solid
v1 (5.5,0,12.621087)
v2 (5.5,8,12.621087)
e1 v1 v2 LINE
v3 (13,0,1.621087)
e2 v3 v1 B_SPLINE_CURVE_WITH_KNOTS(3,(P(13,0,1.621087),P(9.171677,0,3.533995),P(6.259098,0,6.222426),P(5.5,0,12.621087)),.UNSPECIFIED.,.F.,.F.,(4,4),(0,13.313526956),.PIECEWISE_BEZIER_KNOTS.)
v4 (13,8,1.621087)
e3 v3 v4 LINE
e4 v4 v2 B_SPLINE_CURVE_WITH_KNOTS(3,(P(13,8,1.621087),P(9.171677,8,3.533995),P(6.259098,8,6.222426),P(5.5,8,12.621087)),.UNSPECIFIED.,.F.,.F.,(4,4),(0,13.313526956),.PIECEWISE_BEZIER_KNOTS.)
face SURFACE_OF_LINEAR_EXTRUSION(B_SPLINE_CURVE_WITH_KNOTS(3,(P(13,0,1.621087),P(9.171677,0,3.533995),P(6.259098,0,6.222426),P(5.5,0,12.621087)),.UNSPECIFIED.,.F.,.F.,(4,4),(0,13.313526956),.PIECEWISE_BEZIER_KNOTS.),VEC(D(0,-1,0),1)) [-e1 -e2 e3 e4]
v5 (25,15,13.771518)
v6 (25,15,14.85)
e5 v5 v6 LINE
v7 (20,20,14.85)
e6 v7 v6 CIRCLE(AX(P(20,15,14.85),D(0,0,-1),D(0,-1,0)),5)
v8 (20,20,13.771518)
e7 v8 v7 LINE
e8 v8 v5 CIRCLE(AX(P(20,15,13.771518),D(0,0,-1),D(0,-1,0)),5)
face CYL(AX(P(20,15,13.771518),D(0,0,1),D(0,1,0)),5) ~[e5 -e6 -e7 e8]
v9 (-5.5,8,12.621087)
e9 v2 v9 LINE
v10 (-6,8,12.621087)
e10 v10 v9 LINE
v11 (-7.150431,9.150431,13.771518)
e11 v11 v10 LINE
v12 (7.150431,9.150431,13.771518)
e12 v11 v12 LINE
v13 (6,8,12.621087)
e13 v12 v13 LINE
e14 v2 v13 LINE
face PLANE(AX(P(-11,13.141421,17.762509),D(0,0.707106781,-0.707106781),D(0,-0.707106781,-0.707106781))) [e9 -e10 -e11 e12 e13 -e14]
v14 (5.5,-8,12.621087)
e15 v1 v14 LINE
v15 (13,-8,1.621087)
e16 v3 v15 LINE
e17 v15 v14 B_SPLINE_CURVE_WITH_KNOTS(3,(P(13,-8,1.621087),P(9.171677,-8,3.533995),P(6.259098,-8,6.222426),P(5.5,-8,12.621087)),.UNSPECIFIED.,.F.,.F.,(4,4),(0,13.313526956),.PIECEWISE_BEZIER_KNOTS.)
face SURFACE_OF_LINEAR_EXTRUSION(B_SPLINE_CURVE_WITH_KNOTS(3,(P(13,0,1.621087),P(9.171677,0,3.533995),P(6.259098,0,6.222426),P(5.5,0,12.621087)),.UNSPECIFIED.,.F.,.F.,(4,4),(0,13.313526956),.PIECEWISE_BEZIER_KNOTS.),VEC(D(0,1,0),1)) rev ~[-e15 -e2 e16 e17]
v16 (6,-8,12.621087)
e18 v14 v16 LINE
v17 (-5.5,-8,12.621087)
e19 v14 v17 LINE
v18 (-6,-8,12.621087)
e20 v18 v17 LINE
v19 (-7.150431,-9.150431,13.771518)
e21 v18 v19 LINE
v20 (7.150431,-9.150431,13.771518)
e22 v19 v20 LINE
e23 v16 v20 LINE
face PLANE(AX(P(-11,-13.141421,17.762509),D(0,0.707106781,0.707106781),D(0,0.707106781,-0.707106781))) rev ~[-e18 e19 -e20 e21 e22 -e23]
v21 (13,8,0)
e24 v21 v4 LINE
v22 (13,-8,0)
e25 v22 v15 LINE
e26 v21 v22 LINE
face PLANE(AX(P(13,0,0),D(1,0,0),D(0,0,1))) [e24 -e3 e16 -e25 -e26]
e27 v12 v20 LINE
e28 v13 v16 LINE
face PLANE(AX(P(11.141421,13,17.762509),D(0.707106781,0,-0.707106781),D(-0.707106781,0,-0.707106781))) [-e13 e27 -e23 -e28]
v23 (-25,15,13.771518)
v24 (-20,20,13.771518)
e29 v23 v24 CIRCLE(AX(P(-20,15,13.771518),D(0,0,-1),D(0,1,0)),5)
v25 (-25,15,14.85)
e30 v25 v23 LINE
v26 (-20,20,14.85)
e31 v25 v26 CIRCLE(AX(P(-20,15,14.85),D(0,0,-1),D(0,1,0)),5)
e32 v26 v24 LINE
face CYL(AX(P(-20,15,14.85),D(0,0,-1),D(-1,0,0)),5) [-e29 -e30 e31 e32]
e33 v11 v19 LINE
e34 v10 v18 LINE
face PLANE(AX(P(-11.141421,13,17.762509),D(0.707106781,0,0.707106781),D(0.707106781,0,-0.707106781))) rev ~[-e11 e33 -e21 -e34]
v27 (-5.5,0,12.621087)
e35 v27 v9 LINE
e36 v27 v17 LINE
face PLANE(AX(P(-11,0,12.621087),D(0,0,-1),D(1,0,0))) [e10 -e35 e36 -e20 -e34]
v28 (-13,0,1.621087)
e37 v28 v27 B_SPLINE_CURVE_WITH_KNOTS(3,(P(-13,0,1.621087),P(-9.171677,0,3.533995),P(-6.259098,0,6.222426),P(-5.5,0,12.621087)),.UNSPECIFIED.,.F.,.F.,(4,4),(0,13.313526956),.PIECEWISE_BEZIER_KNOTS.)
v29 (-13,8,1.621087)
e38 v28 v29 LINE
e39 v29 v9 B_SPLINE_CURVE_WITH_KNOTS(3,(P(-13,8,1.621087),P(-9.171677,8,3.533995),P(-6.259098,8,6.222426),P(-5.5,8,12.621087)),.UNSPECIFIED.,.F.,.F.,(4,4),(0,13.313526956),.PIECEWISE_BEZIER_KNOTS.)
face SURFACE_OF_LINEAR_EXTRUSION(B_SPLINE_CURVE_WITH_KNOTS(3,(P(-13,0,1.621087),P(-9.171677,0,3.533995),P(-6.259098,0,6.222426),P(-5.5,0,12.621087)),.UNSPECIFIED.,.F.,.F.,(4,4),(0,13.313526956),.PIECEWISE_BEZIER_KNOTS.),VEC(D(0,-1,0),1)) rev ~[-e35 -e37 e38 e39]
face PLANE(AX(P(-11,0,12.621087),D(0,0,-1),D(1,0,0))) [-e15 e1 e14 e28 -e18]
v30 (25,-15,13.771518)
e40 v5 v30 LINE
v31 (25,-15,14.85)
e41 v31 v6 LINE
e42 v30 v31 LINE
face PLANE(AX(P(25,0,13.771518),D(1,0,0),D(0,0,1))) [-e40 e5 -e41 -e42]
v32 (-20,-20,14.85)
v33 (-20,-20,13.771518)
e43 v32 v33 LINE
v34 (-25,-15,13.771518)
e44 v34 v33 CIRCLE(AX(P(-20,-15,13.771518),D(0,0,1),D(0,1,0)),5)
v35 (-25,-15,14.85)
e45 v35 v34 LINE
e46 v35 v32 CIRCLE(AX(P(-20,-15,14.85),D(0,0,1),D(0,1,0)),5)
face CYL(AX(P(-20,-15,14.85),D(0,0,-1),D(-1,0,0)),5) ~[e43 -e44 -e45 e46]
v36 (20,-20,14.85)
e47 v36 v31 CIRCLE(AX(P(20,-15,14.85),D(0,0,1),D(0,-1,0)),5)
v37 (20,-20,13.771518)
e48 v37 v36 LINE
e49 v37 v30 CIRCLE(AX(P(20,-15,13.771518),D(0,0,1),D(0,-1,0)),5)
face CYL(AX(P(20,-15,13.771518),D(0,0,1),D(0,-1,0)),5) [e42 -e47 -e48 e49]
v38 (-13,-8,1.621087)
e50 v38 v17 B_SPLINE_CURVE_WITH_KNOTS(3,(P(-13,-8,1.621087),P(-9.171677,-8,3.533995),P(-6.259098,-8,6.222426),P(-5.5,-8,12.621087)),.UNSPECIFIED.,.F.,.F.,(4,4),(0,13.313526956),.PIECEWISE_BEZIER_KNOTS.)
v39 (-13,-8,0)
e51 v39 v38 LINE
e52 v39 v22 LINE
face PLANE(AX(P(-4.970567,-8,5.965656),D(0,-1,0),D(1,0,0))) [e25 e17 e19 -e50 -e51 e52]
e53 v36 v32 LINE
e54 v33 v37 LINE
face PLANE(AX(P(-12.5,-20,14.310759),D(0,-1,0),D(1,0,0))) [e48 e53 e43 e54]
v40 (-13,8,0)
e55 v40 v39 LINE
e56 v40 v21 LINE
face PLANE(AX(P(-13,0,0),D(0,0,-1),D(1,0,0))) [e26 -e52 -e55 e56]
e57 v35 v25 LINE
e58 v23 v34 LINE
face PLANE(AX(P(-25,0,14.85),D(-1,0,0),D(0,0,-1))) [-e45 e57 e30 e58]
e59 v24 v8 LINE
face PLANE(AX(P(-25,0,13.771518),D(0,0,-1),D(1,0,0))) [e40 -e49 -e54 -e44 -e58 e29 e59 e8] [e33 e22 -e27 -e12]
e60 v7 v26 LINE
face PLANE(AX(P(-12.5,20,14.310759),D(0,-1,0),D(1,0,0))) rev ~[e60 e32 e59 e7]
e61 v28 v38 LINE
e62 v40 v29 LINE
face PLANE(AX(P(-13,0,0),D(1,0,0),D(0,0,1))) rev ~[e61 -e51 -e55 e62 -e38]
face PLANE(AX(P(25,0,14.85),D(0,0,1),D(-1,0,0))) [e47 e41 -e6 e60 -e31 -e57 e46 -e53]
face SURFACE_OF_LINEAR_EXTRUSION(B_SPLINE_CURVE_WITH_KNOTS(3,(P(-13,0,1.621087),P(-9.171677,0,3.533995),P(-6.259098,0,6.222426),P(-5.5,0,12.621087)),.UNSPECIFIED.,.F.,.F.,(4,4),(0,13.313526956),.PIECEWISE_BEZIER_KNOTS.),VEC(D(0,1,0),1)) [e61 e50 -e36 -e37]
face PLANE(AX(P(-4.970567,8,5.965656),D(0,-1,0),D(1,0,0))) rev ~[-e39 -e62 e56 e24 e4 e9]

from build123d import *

# Parameters (mm, degrees)
F1_DEPTH     = 20
F2_DEPTH     = 13
F0_W         = 13
F0_H         = 1.6210871795
F3_T4_DEPTH  = 22
F3_T9_DEPTH  = 26
F3_T14_DEPTH = 26
F3_T19_DEPTH = 22
F3_T25_DEPTH = 38.8584149398
F3_T30_DEPTH = 34.8584149398
F3_T38_DEPTH = 34.8584149398
F3_T43_DEPTH = 38.8584149398
F3_T51_DEPTH = 38.8584149398
F3_T56_DEPTH = 34.8584149398
F3_T64_DEPTH = 38.8584149398
F3_T69_DEPTH = 34.8584149398
F4_R         = 5
F5_R         = 5
F7_DEPTH     = 8


# Not quite as in the source:
# - a fillet or chamfer that OpenCascade refuses, or shapes differently, is made with other operations: its cross-section is extruded or revolved along the edge and cut away or added


with BuildPart() as f1:
    # F0 (on Front) → F1 (new body, symmetric)
    with BuildSketch(Plane.XZ):
        Polygon((0, 13.7715177082), (0, 14.85), (-25, 14.85), (-25, 13.7715177082), (-11, 13.7715177082), align=None)
        Polygon((25, 14.85), (0, 14.85), (0, 13.7715177082), (11, 13.7715177082), (25, 13.7715177082), align=None)
    extrude(amount=F1_DEPTH, both=True)

    # F0 (on Front) → F2 (join, symmetric)
    with BuildSketch(Plane.XZ):
        Polygon((0, 12.6210871795), (0, 13.7715177082), (-11, 13.7715177082), (-11, 12.6210871795), (-5.5, 12.6210871795), align=None)
        Polygon((11, 13.7715177082), (0, 13.7715177082), (0, 12.6210871795), (5.5, 12.6210871795), (11, 12.6210871795), align=None)
    extrude(amount=F2_DEPTH, both=True)

    # F3: chamfer of 5 on 4 edges, made by hand


with BuildPart() as f2:
    # F0 (on Front) → F2, piece 2 (new body, symmetric)
    with BuildSketch(Plane.XZ):
        with Locations((-6.5, 0.8105435898)):
            Rectangle(F0_W, F0_H)
        with Locations((6.5, 0.8105435898)):
            Rectangle(F0_W, F0_H)
    extrude(amount=F2_DEPTH, both=True)

    # F4
    f4_edges = [f2.edges().sort_by_distance(p)[0] for p in [
        (-13, 13, 0.810544),
        (-13, -13, 0.810544),
        (13, -13, 0.810544),
        (13, 13, 0.810544),
    ]]
    fillet(f4_edges, radius=F4_R)


with BuildPart() as f3_tool2:
    # F3_s3 → F3_t4 (new body)
    with BuildSketch(Plane.YZ.offset(-11)):
        with BuildLine():
            Line((13.1414213562, 17.7625085358), (7.8585786438, 12.4796658233))
            Line((7.8585786438, 12.4796658233), (7.8585786438, 12.3796658233))
            ThreePointArc((7.8585786438, 12.3796658233), (10.4292893219, 12.5210871795), (13, 12.5210871795))
            Line((13, 12.5210871795), (13.1, 12.6210871795))
            ThreePointArc((13.1, 12.6210871795), (13.1, 15.1917978577), (13.2414213562, 17.7625085358))
            Line((13.2414213562, 17.7625085358), (13.1414213562, 17.7625085358))
        make_face()
    extrude(amount=F3_T4_DEPTH)

    split(bisect_by=Plane.XY.offset(13.7715177082), keep=Keep.BOTTOM)


with BuildPart() as f1_1:
    add(f1.part)

    # F3_t1: cut F3_tool2
    add(f3_tool2.part, mode=Mode.SUBTRACT)


with BuildPart() as f3_tool7:
    # F3_s8 → F3_t9 (new body)
    with BuildSketch(Plane.XZ.offset(-13)):
        with BuildLine():
            Line((-11.1414213562, 17.7625085358), (-5.8585786438, 12.4796658233))
            Line((-5.8585786438, 12.4796658233), (-5.8585786438, 12.3796658233))
            ThreePointArc((-5.8585786438, 12.3796658233), (-8.4292893219, 12.5210871795), (-11, 12.5210871795))
            Line((-11, 12.5210871795), (-11.1, 12.6210871795))
            ThreePointArc((-11.1, 12.6210871795), (-11.1, 15.1917978577), (-11.2414213562, 17.7625085358))
            Line((-11.2414213562, 17.7625085358), (-11.1414213562, 17.7625085358))
        make_face()
    extrude(amount=F3_T9_DEPTH)

    split(bisect_by=Plane.XY.offset(13.7715177082), keep=Keep.BOTTOM)


with BuildPart() as f1_2:
    add(f1_1.part)

    # F3_t6: cut F3_tool7
    add(f3_tool7.part, mode=Mode.SUBTRACT)


with BuildPart() as f3_tool12:
    # F3_s13 → F3_t14 (new body)
    with BuildSketch(Plane.XZ.offset(-13)):
        with BuildLine():
            Line((11.1414213562, 17.7625085358), (5.8585786438, 12.4796658233))
            Line((5.8585786438, 12.4796658233), (5.8585786438, 12.3796658233))
            ThreePointArc((5.8585786438, 12.3796658233), (8.4292893219, 12.5210871795), (11, 12.5210871795))
            Line((11, 12.5210871795), (11.1, 12.6210871795))
            ThreePointArc((11.1, 12.6210871795), (11.1, 15.1917978577), (11.2414213562, 17.7625085358))
            Line((11.2414213562, 17.7625085358), (11.1414213562, 17.7625085358))
        make_face()
    extrude(amount=F3_T14_DEPTH)

    split(bisect_by=Plane.XY.offset(13.7715177082), keep=Keep.BOTTOM)


with BuildPart() as f1_3:
    add(f1_2.part)

    # F3_t11: cut F3_tool12
    add(f3_tool12.part, mode=Mode.SUBTRACT)


with BuildPart() as f3_tool17:
    # F3_s18 → F3_t19 (new body)
    with BuildSketch(Plane.YZ.offset(-11)):
        with BuildLine():
            Line((-13.1414213562, 17.7625085358), (-7.8585786438, 12.4796658233))
            Line((-7.8585786438, 12.4796658233), (-7.8585786438, 12.3796658233))
            ThreePointArc((-7.8585786438, 12.3796658233), (-10.4292893219, 12.5210871795), (-13, 12.5210871795))
            Line((-13, 12.5210871795), (-13.1, 12.6210871795))
            ThreePointArc((-13.1, 12.6210871795), (-13.1, 15.1917978577), (-13.2414213562, 17.7625085358))
            Line((-13.2414213562, 17.7625085358), (-13.1414213562, 17.7625085358))
        make_face()
    extrude(amount=F3_T19_DEPTH)

    split(bisect_by=Plane.XY.offset(13.7715177082), keep=Keep.BOTTOM)


with BuildPart() as f1_4:
    add(f1_3.part)

    # F3_t16: cut F3_tool17
    add(f3_tool17.part, mode=Mode.SUBTRACT)


with BuildPart() as f3_tool23:
    # F3_s24 → F3_t25 (new body)
    with BuildSketch(Plane.XZ.offset(-25.8584149398)):
        with BuildLine():
            Line((-11.1414213562, 17.7625085358), (-5.8585786438, 12.4796658233))
            Line((-5.8585786438, 12.4796658233), (-5.8585786438, 12.3796658233))
            ThreePointArc((-5.8585786438, 12.3796658233), (-8.4292893219, 12.5210871795), (-11, 12.5210871795))
            Line((-11, 12.5210871795), (-11.1, 12.6210871795))
            ThreePointArc((-11.1, 12.6210871795), (-11.1, 15.1917978577), (-11.2414213562, 17.7625085358))
            Line((-11.2414213562, 17.7625085358), (-11.1414213562, 17.7625085358))
        make_face()
    extrude(amount=F3_T25_DEPTH)

    split(bisect_by=Plane.XY.offset(13.7715177082), keep=Keep.BOTTOM)

    split(bisect_by=Plane.XZ.offset(-13), keep=Keep.BOTTOM)


with BuildPart() as f3_tool28:
    # F3_s29 → F3_t30 (new body)
    with BuildSketch(Plane.YZ.offset(-23.8584149398)):
        with BuildLine():
            Line((13.1414213562, 17.7625085358), (7.8585786438, 12.4796658233))
            Line((7.8585786438, 12.4796658233), (7.8585786438, 12.3796658233))
            ThreePointArc((7.8585786438, 12.3796658233), (10.4292893219, 12.5210871795), (13, 12.5210871795))
            Line((13, 12.5210871795), (13.1, 12.6210871795))
            ThreePointArc((13.1, 12.6210871795), (13.1, 15.1917978577), (13.2414213562, 17.7625085358))
            Line((13.2414213562, 17.7625085358), (13.1414213562, 17.7625085358))
        make_face()
    extrude(amount=F3_T30_DEPTH)

    split(bisect_by=Plane.XY.offset(13.7715177082), keep=Keep.BOTTOM)

    split(bisect_by=Plane.YZ.offset(-11), keep=Keep.BOTTOM)


with BuildPart() as f3_tool23_1:
    add(f3_tool23.part)

    # F3_t33: intersect F3_tool28
    add(f3_tool28.part, mode=Mode.INTERSECT)


with BuildPart() as f1_5:
    add(f1_4.part)

    # F3_t21: cut F3_tool23
    add(f3_tool23_1.part, mode=Mode.SUBTRACT)


with BuildPart() as f3_tool36:
    # F3_s37 → F3_t38 (new body)
    with BuildSketch(Plane.YZ.offset(-11)):
        with BuildLine():
            Line((13.1414213562, 17.7625085358), (7.8585786438, 12.4796658233))
            Line((7.8585786438, 12.4796658233), (7.8585786438, 12.3796658233))
            ThreePointArc((7.8585786438, 12.3796658233), (10.4292893219, 12.5210871795), (13, 12.5210871795))
            Line((13, 12.5210871795), (13.1, 12.6210871795))
            ThreePointArc((13.1, 12.6210871795), (13.1, 15.1917978577), (13.2414213562, 17.7625085358))
            Line((13.2414213562, 17.7625085358), (13.1414213562, 17.7625085358))
        make_face()
    extrude(amount=F3_T38_DEPTH)

    split(bisect_by=Plane.XY.offset(13.7715177082), keep=Keep.BOTTOM)

    split(bisect_by=Plane.YZ.offset(11), keep=Keep.TOP)


with BuildPart() as f3_tool41:
    # F3_s42 → F3_t43 (new body)
    with BuildSketch(Plane.XZ.offset(-25.8584149398)):
        with BuildLine():
            Line((11.1414213562, 17.7625085358), (5.8585786438, 12.4796658233))
            Line((5.8585786438, 12.4796658233), (5.8585786438, 12.3796658233))
            ThreePointArc((5.8585786438, 12.3796658233), (8.4292893219, 12.5210871795), (11, 12.5210871795))
            Line((11, 12.5210871795), (11.1, 12.6210871795))
            ThreePointArc((11.1, 12.6210871795), (11.1, 15.1917978577), (11.2414213562, 17.7625085358))
            Line((11.2414213562, 17.7625085358), (11.1414213562, 17.7625085358))
        make_face()
    extrude(amount=F3_T43_DEPTH)

    split(bisect_by=Plane.XY.offset(13.7715177082), keep=Keep.BOTTOM)

    split(bisect_by=Plane.XZ.offset(-13), keep=Keep.BOTTOM)


with BuildPart() as f3_tool36_1:
    add(f3_tool36.part)

    # F3_t46: intersect F3_tool41
    add(f3_tool41.part, mode=Mode.INTERSECT)


with BuildPart() as f1_6:
    add(f1_5.part)

    # F3_t34: cut F3_tool36
    add(f3_tool36_1.part, mode=Mode.SUBTRACT)


with BuildPart() as f3_tool49:
    # F3_s50 → F3_t51 (new body)
    with BuildSketch(Plane.XZ.offset(-13)):
        with BuildLine():
            Line((-11.1414213562, 17.7625085358), (-5.8585786438, 12.4796658233))
            Line((-5.8585786438, 12.4796658233), (-5.8585786438, 12.3796658233))
            ThreePointArc((-5.8585786438, 12.3796658233), (-8.4292893219, 12.5210871795), (-11, 12.5210871795))
            Line((-11, 12.5210871795), (-11.1, 12.6210871795))
            ThreePointArc((-11.1, 12.6210871795), (-11.1, 15.1917978577), (-11.2414213562, 17.7625085358))
            Line((-11.2414213562, 17.7625085358), (-11.1414213562, 17.7625085358))
        make_face()
    extrude(amount=F3_T51_DEPTH)

    split(bisect_by=Plane.XY.offset(13.7715177082), keep=Keep.BOTTOM)

    split(bisect_by=Plane.XZ.offset(13), keep=Keep.TOP)


with BuildPart() as f3_tool54:
    # F3_s55 → F3_t56 (new body)
    with BuildSketch(Plane.YZ.offset(-23.8584149398)):
        with BuildLine():
            Line((-13.1414213562, 17.7625085358), (-7.8585786438, 12.4796658233))
            Line((-7.8585786438, 12.4796658233), (-7.8585786438, 12.3796658233))
            ThreePointArc((-7.8585786438, 12.3796658233), (-10.4292893219, 12.5210871795), (-13, 12.5210871795))
            Line((-13, 12.5210871795), (-13.1, 12.6210871795))
            ThreePointArc((-13.1, 12.6210871795), (-13.1, 15.1917978577), (-13.2414213562, 17.7625085358))
            Line((-13.2414213562, 17.7625085358), (-13.1414213562, 17.7625085358))
        make_face()
    extrude(amount=F3_T56_DEPTH)

    split(bisect_by=Plane.XY.offset(13.7715177082), keep=Keep.BOTTOM)

    split(bisect_by=Plane.YZ.offset(-11), keep=Keep.BOTTOM)


with BuildPart() as f3_tool49_1:
    add(f3_tool49.part)

    # F3_t59: intersect F3_tool54
    add(f3_tool54.part, mode=Mode.INTERSECT)


with BuildPart() as f1_7:
    add(f1_6.part)

    # F3_t47: cut F3_tool49
    add(f3_tool49_1.part, mode=Mode.SUBTRACT)


with BuildPart() as f3_tool62:
    # F3_s63 → F3_t64 (new body)
    with BuildSketch(Plane.XZ.offset(-13)):
        with BuildLine():
            Line((11.1414213562, 17.7625085358), (5.8585786438, 12.4796658233))
            Line((5.8585786438, 12.4796658233), (5.8585786438, 12.3796658233))
            ThreePointArc((5.8585786438, 12.3796658233), (8.4292893219, 12.5210871795), (11, 12.5210871795))
            Line((11, 12.5210871795), (11.1, 12.6210871795))
            ThreePointArc((11.1, 12.6210871795), (11.1, 15.1917978577), (11.2414213562, 17.7625085358))
            Line((11.2414213562, 17.7625085358), (11.1414213562, 17.7625085358))
        make_face()
    extrude(amount=F3_T64_DEPTH)

    split(bisect_by=Plane.XY.offset(13.7715177082), keep=Keep.BOTTOM)

    split(bisect_by=Plane.XZ.offset(13), keep=Keep.TOP)


with BuildPart() as f3_tool67:
    # F3_s68 → F3_t69 (new body)
    with BuildSketch(Plane.YZ.offset(-11)):
        with BuildLine():
            Line((-13.1414213562, 17.7625085358), (-7.8585786438, 12.4796658233))
            Line((-7.8585786438, 12.4796658233), (-7.8585786438, 12.3796658233))
            ThreePointArc((-7.8585786438, 12.3796658233), (-10.4292893219, 12.5210871795), (-13, 12.5210871795))
            Line((-13, 12.5210871795), (-13.1, 12.6210871795))
            ThreePointArc((-13.1, 12.6210871795), (-13.1, 15.1917978577), (-13.2414213562, 17.7625085358))
            Line((-13.2414213562, 17.7625085358), (-13.1414213562, 17.7625085358))
        make_face()
    extrude(amount=F3_T69_DEPTH)

    split(bisect_by=Plane.XY.offset(13.7715177082), keep=Keep.BOTTOM)

    split(bisect_by=Plane.YZ.offset(11), keep=Keep.TOP)


with BuildPart() as f3_tool62_1:
    add(f3_tool62.part)

    # F3_t72: intersect F3_tool67
    add(f3_tool67.part, mode=Mode.INTERSECT)


with BuildPart() as f1_8:
    add(f1_7.part)

    # F3_t60: cut F3_tool62
    add(f3_tool62_1.part, mode=Mode.SUBTRACT)

    # F5
    f5_edges = [f1_8.edges().sort_by_distance(p)[0] for p in [
        (-25, -20, 14.310759),
        (-25, 20, 14.310759),
        (25, -20, 14.310759),
        (25, 20, 14.310759),
    ]]
    fillet(f5_edges, radius=F5_R)

    # F0 (on Front) → F7 (join, symmetric)
    with BuildSketch(Plane.XZ):
        with BuildLine():
            Line((0, 1.6210871795), (0, 12.6210871795))
            Line((0, 12.6210871795), (-5.5, 12.6210871795))
            add(Edge.make_bspline(
                [(-13, 1.6210871795), (-9.1716769267, 3.5339947176), (-6.259098086, 6.2224261798), (-5.5, 12.6210871795)],
                knots=[0, 0, 0, 0, 13.3135269557, 13.3135269557, 13.3135269557, 13.3135269557], degree=3))
            Line((-13, 1.6210871795), (0, 1.6210871795))
        make_face()
        with Locations((-6.5, 0.8105435898)):
            Rectangle(F0_W, F0_H)
        with BuildLine():
            Line((5.5, 12.6210871795), (0, 12.6210871795))
            Line((0, 12.6210871795), (0, 1.6210871795))
            Line((0, 1.6210871795), (13, 1.6210871795))
            add(Edge.make_bspline(
                [(13, 1.6210871795), (9.1716769267, 3.5339947176), (6.259098086, 6.2224261798), (5.5, 12.6210871795)],
                knots=[0, 0, 0, 0, 13.3135269557, 13.3135269557, 13.3135269557, 13.3135269557], degree=3))
        make_face()
        with Locations((6.5, 0.8105435898)):
            Rectangle(F0_W, F0_H)
    extrude(amount=F7_DEPTH, both=True)


solid = f1_8.part
